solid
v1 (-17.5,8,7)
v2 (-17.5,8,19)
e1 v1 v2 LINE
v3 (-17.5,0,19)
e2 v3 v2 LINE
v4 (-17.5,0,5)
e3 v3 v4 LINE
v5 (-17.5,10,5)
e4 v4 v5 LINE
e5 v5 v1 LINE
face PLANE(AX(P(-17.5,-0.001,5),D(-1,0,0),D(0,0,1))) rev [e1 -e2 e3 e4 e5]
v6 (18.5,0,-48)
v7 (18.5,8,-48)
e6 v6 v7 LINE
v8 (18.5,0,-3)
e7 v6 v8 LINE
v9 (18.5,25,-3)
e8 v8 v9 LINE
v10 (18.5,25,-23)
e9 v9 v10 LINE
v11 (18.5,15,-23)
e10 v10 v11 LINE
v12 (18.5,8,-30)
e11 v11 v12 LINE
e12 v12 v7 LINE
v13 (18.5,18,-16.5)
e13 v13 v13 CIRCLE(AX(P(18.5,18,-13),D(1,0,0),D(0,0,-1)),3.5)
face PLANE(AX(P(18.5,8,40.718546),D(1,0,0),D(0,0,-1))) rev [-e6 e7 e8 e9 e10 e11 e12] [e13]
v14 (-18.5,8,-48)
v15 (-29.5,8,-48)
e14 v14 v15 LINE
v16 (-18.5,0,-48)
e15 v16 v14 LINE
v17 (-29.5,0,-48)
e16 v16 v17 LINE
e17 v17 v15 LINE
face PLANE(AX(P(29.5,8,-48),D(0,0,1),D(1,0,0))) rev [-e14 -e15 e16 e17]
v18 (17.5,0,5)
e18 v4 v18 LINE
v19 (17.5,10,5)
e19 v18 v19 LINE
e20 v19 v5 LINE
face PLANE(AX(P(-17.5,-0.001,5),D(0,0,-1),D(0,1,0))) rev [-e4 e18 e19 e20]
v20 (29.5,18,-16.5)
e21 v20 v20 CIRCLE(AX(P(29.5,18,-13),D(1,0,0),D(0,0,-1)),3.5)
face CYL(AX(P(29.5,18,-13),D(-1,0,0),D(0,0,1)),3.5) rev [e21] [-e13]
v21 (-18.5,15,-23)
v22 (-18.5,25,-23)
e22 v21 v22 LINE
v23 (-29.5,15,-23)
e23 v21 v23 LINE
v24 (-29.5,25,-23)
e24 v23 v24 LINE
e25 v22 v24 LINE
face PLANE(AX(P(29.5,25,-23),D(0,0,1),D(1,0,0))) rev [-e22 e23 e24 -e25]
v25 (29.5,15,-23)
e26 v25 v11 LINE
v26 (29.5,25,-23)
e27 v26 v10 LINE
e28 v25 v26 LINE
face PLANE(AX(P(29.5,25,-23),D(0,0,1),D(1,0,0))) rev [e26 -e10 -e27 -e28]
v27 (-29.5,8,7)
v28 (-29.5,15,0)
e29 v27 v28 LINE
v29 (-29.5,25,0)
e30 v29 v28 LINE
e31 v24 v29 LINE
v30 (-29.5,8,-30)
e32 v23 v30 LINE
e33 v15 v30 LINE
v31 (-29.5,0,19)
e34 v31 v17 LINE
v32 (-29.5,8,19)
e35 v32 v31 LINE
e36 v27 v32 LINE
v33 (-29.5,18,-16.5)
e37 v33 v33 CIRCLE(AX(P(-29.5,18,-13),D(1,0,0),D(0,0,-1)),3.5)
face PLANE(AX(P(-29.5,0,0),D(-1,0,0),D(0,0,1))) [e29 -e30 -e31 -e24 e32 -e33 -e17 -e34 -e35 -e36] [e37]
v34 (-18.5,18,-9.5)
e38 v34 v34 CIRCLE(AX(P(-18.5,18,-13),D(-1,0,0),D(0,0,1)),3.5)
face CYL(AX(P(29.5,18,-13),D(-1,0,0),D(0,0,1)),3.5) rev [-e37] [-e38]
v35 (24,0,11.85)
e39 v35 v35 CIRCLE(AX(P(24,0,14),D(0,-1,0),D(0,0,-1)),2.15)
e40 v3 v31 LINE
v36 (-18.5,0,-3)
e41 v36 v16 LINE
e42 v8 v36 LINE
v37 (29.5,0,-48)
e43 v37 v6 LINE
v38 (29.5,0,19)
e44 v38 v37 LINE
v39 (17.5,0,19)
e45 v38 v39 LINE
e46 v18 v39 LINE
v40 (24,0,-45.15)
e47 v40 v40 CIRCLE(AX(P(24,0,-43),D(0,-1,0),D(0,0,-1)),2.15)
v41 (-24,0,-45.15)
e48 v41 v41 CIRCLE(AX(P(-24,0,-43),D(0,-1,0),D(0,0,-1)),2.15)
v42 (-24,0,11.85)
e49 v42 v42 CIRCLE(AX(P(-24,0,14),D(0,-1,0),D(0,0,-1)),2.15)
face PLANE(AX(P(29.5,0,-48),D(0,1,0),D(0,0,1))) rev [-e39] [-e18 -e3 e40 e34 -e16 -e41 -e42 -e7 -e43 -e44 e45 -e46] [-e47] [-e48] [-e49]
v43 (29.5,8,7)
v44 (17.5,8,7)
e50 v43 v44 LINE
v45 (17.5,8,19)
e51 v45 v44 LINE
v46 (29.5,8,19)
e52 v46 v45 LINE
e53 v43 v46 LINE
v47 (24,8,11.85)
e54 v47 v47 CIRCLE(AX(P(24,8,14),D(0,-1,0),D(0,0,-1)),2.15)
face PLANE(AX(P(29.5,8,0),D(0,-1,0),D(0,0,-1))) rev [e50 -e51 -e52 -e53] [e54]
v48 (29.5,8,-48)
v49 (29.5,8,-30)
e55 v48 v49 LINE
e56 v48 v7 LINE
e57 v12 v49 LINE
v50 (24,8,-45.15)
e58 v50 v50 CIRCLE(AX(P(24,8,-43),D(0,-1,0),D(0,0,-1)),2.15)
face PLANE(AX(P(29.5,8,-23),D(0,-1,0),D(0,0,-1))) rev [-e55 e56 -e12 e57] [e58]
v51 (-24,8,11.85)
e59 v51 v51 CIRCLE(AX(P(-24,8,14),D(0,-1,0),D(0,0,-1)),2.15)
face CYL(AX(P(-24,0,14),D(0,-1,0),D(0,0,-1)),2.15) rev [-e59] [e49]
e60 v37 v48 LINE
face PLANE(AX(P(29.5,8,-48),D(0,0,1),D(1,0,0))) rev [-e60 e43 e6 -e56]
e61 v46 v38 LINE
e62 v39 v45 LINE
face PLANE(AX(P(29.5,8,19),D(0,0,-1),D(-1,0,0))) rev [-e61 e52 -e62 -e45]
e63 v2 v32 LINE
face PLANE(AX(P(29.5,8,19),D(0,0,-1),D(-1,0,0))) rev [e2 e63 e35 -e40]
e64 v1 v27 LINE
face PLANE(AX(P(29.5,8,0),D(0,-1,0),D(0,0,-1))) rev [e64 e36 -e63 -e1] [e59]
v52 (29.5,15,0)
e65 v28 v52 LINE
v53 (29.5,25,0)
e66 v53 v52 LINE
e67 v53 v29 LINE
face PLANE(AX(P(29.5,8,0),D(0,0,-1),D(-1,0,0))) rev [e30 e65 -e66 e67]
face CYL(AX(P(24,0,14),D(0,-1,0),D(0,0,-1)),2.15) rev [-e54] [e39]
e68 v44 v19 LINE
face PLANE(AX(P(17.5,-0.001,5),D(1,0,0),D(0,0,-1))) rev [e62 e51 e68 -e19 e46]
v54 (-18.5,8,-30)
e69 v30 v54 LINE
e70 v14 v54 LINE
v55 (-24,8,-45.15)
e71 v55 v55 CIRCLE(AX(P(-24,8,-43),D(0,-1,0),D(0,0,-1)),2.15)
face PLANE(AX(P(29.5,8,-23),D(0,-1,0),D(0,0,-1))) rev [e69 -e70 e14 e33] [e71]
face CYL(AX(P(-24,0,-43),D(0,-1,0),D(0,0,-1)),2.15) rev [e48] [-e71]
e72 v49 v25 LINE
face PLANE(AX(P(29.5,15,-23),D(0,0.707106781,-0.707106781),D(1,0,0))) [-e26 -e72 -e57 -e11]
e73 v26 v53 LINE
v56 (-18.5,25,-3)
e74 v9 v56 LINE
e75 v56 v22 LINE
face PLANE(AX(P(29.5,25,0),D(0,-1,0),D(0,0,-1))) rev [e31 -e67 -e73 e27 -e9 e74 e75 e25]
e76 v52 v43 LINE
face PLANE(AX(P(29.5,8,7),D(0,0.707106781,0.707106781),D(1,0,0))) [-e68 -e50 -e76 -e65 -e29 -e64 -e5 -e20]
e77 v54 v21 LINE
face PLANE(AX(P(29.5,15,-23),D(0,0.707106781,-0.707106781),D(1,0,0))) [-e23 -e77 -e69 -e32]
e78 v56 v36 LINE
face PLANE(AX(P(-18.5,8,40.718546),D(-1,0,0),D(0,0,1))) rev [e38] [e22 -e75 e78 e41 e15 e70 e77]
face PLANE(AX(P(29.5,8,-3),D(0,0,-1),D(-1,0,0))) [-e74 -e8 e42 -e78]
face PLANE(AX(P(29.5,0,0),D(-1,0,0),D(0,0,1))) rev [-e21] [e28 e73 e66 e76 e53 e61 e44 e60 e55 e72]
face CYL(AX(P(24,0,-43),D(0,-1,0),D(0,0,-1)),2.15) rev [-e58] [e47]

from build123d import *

# Parameters (mm, degrees)
SKETCH_1_R          = 3.5
EXTRUDE_1_DEPTH     = 29.5
SKETCH_3_W          = 37
SKETCH_3_H          = 17
CUT_EXTRUDE_2_DEPTH = 20
CUT_EXTRUDE_3_REACH = 60.849
SKETCH_4_W          = 37
SKETCH_4_H          = 45
SKETCH_4_W_2        = 35
SKETCH_4_H_2        = 14
HOLE_WIZARD_M4_1_D  = 4.3
CHAMFER_1_SIZE      = 7


with BuildPart() as part:
    # 草图1 → 凸台-拉伸1 (new, symmetric)
    with BuildSketch(Plane(origin=(0, 0, 0), x_dir=(0, 0, -1), z_dir=(1, 0, 0))):
        Polygon((0, 8), (0, 25), (23, 25), (23, 8), (48, 8), (48, 0), (-19, 0), (-19, 8), align=None)
        with Locations((13, 18)):
            Circle(SKETCH_1_R, mode=Mode.SUBTRACT)
    extrude(amount=EXTRUDE_1_DEPTH, both=True)

    # 草图3 → 切除-拉伸2 (cut)
    with BuildSketch(Plane(origin=(0, 0, -23), x_dir=(-1, 0, 0), z_dir=(0, 0, -1))):
        with Locations((0, 16.5)):
            Rectangle(SKETCH_3_W, SKETCH_3_H)
    extrude(amount=-CUT_EXTRUDE_2_DEPTH, mode=Mode.SUBTRACT)

    # 草图4 → 切除-拉伸3 (cut, up to next)
    with BuildSketch(Plane(origin=(0, 8, 0), x_dir=(1, 0, 0), z_dir=(0, 1, 0)), mode=Mode.PRIVATE) as cut_extrude_3_sk1:
        with Locations((0, 25.5)):
            Rectangle(SKETCH_4_W, SKETCH_4_H)
    cut_extrude_3_tool1 = extrude(cut_extrude_3_sk1.sketch, amount=-CUT_EXTRUDE_3_REACH, mode=Mode.PRIVATE) & part.part
    # 草图4 → 切除-拉伸3 (cut, up to next)
    with BuildSketch(Plane(origin=(0, 8, 0), x_dir=(1, 0, 0), z_dir=(0, 1, 0)), mode=Mode.PRIVATE) as cut_extrude_3_sk2:
        with Locations((0, -12)):
            Rectangle(SKETCH_4_W_2, SKETCH_4_H_2)
    cut_extrude_3_tool2 = extrude(cut_extrude_3_sk2.sketch, amount=-CUT_EXTRUDE_3_REACH, mode=Mode.PRIVATE) & part.part
    add(cut_extrude_3_tool1.solids().sort_by_distance((0, 8, -25.5))[0], mode=Mode.SUBTRACT)
    add(cut_extrude_3_tool2.solids().sort_by_distance((0, 8, 12))[0], mode=Mode.SUBTRACT)

    # M4 间隙孔1 (through all)
    with Locations(Plane(origin=(0, 0, 0), x_dir=(-1, 0, 0), z_dir=(0, -1, 0))):
        with Locations((24, -14), (24, 43), (-24, -14), (-24, 43)):
            Hole(HOLE_WIZARD_M4_1_D / 2)

    # 倒角1
    # the kernel refuses this chamfer: 7 mm, written as the material it adds along each edge
    with BuildSketch(Plane(origin=(-29.5, 8, 0), x_dir=(0, 0.9996219169112968, -0.027495876610586365), z_dir=(1, 0, 0))) as chamfer_1_piece_1_section:
        Polygon((CHAMFER_1_SIZE * 0.999621916911, CHAMFER_1_SIZE * 0.0274958766106), (-CHAMFER_1_SIZE * 0.0274958766106, CHAMFER_1_SIZE * 0.999621916911), (0, 0), align=None)
    chamfer_1_piece_1 = extrude(amount=59, mode=Mode.PRIVATE)
    chamfer_1_piece_1 = split(chamfer_1_piece_1, bisect_by=Plane(origin=(-17.5, 10.498239804, 1.946316209), z_dir=(-1, 0, 0)), keep=Keep.TOP, mode=Mode.PRIVATE)
    chamfer_1_piece_1 = split(chamfer_1_piece_1, bisect_by=Plane(origin=(-23.5, 10.498239804, 5), z_dir=(0, 0, -1)), keep=Keep.TOP, mode=Mode.PRIVATE)
    add(chamfer_1_piece_1)
    with BuildSketch(Plane(origin=(-29.5, 8, 0), x_dir=(0, 0.9996219169112968, -0.027495876610586365), z_dir=(1, 0, 0))) as chamfer_1_piece_2_section:
        Polygon((CHAMFER_1_SIZE * 0.999621916911, CHAMFER_1_SIZE * 0.0274958766106), (-CHAMFER_1_SIZE * 0.0274958766106, CHAMFER_1_SIZE * 0.999621916911), (0, 0), align=None)
    chamfer_1_piece_2 = extrude(amount=59, mode=Mode.PRIVATE)
    chamfer_1_piece_2 = split(chamfer_1_piece_2, bisect_by=Plane(origin=(-17.5, 8.493423537, 5.774901665), z_dir=(-1, 0, 0)), keep=Keep.TOP, mode=Mode.PRIVATE)
    chamfer_1_piece_2 = split(chamfer_1_piece_2, bisect_by=Plane(origin=(-23.5, 8.493423537, 5), z_dir=(0, 0, 1)), keep=Keep.TOP, mode=Mode.PRIVATE)
    add(chamfer_1_piece_2)
    with BuildSketch(Plane(origin=(-29.5, 8, 0), x_dir=(0, 0.9996219169112968, -0.027495876610586365), z_dir=(1, 0, 0))) as chamfer_1_piece_3_section:
        Polygon((CHAMFER_1_SIZE * 0.999621916911, CHAMFER_1_SIZE * 0.0274958766106), (-CHAMFER_1_SIZE * 0.0274958766106, CHAMFER_1_SIZE * 0.999621916911), (0, 0), align=None)
    chamfer_1_piece_3 = extrude(amount=59, mode=Mode.PRIVATE)
    chamfer_1_piece_3 = split(chamfer_1_piece_3, bisect_by=Plane(origin=(-17.5, 10.498239804, 1.946316209), z_dir=(1, 0, 0)), keep=Keep.TOP, mode=Mode.PRIVATE)
    chamfer_1_piece_3 = split(chamfer_1_piece_3, bisect_by=Plane(origin=(0, 10.498239804, 5), z_dir=(0, 0, -1)), keep=Keep.TOP, mode=Mode.PRIVATE)
    chamfer_1_piece_3 = split(chamfer_1_piece_3, bisect_by=Plane(origin=(17.5, 10.498239804, 1.946316209), z_dir=(-1, 0, 0)), keep=Keep.TOP, mode=Mode.PRIVATE)
    add(chamfer_1_piece_3)
    with BuildSketch(Plane(origin=(-29.5, 8, 0), x_dir=(0, 0.9996219169112968, -0.027495876610586365), z_dir=(1, 0, 0))) as chamfer_1_piece_4_section:
        Polygon((CHAMFER_1_SIZE * 0.999621916911, CHAMFER_1_SIZE * 0.0274958766106), (-CHAMFER_1_SIZE * 0.0274958766106, CHAMFER_1_SIZE * 0.999621916911), (0, 0), align=None)
    chamfer_1_piece_4 = extrude(amount=59, mode=Mode.PRIVATE)
    chamfer_1_piece_4 = split(chamfer_1_piece_4, bisect_by=Plane(origin=(23.5, 10.498239804, 5), z_dir=(0, 0, -1)), keep=Keep.TOP, mode=Mode.PRIVATE)
    chamfer_1_piece_4 = split(chamfer_1_piece_4, bisect_by=Plane(origin=(17.5, 10.498239804, 1.946316209), z_dir=(1, 0, 0)), keep=Keep.TOP, mode=Mode.PRIVATE)
    add(chamfer_1_piece_4)
    with BuildSketch(Plane(origin=(-29.5, 8, 0), x_dir=(0, 0.9996219169112968, -0.027495876610586365), z_dir=(1, 0, 0))) as chamfer_1_piece_5_section:
        Polygon((CHAMFER_1_SIZE * 0.999621916911, CHAMFER_1_SIZE * 0.0274958766106), (-CHAMFER_1_SIZE * 0.0274958766106, CHAMFER_1_SIZE * 0.999621916911), (0, 0), align=None)
    chamfer_1_piece_5 = extrude(amount=59, mode=Mode.PRIVATE)
    chamfer_1_piece_5 = split(chamfer_1_piece_5, bisect_by=Plane(origin=(23.5, 8.493423537, 5), z_dir=(0, 0, 1)), keep=Keep.TOP, mode=Mode.PRIVATE)
    chamfer_1_piece_5 = split(chamfer_1_piece_5, bisect_by=Plane(origin=(17.5, 8.493423537, 5.774901665), z_dir=(1, 0, 0)), keep=Keep.TOP, mode=Mode.PRIVATE)
    add(chamfer_1_piece_5)
    with BuildSketch(Plane(origin=(29.5, 8, -23), x_dir=(0, 0.9996219169112968, 0.02749587661058661), z_dir=(-1, 0, 0)), Plane(origin=(-18.5, 8, -23), x_dir=(0, 0.9996219169112968, 0.02749587661058661), z_dir=(-1, 0, 0))) as chamfer_1_piece_6:
        Polygon((CHAMFER_1_SIZE * 0.999621916911, CHAMFER_1_SIZE * 0.0274958766106), (-CHAMFER_1_SIZE * 0.0274958766106, CHAMFER_1_SIZE * 0.999621916911), (0, 0), align=None)
    extrude(amount=11)


solid = part.part
